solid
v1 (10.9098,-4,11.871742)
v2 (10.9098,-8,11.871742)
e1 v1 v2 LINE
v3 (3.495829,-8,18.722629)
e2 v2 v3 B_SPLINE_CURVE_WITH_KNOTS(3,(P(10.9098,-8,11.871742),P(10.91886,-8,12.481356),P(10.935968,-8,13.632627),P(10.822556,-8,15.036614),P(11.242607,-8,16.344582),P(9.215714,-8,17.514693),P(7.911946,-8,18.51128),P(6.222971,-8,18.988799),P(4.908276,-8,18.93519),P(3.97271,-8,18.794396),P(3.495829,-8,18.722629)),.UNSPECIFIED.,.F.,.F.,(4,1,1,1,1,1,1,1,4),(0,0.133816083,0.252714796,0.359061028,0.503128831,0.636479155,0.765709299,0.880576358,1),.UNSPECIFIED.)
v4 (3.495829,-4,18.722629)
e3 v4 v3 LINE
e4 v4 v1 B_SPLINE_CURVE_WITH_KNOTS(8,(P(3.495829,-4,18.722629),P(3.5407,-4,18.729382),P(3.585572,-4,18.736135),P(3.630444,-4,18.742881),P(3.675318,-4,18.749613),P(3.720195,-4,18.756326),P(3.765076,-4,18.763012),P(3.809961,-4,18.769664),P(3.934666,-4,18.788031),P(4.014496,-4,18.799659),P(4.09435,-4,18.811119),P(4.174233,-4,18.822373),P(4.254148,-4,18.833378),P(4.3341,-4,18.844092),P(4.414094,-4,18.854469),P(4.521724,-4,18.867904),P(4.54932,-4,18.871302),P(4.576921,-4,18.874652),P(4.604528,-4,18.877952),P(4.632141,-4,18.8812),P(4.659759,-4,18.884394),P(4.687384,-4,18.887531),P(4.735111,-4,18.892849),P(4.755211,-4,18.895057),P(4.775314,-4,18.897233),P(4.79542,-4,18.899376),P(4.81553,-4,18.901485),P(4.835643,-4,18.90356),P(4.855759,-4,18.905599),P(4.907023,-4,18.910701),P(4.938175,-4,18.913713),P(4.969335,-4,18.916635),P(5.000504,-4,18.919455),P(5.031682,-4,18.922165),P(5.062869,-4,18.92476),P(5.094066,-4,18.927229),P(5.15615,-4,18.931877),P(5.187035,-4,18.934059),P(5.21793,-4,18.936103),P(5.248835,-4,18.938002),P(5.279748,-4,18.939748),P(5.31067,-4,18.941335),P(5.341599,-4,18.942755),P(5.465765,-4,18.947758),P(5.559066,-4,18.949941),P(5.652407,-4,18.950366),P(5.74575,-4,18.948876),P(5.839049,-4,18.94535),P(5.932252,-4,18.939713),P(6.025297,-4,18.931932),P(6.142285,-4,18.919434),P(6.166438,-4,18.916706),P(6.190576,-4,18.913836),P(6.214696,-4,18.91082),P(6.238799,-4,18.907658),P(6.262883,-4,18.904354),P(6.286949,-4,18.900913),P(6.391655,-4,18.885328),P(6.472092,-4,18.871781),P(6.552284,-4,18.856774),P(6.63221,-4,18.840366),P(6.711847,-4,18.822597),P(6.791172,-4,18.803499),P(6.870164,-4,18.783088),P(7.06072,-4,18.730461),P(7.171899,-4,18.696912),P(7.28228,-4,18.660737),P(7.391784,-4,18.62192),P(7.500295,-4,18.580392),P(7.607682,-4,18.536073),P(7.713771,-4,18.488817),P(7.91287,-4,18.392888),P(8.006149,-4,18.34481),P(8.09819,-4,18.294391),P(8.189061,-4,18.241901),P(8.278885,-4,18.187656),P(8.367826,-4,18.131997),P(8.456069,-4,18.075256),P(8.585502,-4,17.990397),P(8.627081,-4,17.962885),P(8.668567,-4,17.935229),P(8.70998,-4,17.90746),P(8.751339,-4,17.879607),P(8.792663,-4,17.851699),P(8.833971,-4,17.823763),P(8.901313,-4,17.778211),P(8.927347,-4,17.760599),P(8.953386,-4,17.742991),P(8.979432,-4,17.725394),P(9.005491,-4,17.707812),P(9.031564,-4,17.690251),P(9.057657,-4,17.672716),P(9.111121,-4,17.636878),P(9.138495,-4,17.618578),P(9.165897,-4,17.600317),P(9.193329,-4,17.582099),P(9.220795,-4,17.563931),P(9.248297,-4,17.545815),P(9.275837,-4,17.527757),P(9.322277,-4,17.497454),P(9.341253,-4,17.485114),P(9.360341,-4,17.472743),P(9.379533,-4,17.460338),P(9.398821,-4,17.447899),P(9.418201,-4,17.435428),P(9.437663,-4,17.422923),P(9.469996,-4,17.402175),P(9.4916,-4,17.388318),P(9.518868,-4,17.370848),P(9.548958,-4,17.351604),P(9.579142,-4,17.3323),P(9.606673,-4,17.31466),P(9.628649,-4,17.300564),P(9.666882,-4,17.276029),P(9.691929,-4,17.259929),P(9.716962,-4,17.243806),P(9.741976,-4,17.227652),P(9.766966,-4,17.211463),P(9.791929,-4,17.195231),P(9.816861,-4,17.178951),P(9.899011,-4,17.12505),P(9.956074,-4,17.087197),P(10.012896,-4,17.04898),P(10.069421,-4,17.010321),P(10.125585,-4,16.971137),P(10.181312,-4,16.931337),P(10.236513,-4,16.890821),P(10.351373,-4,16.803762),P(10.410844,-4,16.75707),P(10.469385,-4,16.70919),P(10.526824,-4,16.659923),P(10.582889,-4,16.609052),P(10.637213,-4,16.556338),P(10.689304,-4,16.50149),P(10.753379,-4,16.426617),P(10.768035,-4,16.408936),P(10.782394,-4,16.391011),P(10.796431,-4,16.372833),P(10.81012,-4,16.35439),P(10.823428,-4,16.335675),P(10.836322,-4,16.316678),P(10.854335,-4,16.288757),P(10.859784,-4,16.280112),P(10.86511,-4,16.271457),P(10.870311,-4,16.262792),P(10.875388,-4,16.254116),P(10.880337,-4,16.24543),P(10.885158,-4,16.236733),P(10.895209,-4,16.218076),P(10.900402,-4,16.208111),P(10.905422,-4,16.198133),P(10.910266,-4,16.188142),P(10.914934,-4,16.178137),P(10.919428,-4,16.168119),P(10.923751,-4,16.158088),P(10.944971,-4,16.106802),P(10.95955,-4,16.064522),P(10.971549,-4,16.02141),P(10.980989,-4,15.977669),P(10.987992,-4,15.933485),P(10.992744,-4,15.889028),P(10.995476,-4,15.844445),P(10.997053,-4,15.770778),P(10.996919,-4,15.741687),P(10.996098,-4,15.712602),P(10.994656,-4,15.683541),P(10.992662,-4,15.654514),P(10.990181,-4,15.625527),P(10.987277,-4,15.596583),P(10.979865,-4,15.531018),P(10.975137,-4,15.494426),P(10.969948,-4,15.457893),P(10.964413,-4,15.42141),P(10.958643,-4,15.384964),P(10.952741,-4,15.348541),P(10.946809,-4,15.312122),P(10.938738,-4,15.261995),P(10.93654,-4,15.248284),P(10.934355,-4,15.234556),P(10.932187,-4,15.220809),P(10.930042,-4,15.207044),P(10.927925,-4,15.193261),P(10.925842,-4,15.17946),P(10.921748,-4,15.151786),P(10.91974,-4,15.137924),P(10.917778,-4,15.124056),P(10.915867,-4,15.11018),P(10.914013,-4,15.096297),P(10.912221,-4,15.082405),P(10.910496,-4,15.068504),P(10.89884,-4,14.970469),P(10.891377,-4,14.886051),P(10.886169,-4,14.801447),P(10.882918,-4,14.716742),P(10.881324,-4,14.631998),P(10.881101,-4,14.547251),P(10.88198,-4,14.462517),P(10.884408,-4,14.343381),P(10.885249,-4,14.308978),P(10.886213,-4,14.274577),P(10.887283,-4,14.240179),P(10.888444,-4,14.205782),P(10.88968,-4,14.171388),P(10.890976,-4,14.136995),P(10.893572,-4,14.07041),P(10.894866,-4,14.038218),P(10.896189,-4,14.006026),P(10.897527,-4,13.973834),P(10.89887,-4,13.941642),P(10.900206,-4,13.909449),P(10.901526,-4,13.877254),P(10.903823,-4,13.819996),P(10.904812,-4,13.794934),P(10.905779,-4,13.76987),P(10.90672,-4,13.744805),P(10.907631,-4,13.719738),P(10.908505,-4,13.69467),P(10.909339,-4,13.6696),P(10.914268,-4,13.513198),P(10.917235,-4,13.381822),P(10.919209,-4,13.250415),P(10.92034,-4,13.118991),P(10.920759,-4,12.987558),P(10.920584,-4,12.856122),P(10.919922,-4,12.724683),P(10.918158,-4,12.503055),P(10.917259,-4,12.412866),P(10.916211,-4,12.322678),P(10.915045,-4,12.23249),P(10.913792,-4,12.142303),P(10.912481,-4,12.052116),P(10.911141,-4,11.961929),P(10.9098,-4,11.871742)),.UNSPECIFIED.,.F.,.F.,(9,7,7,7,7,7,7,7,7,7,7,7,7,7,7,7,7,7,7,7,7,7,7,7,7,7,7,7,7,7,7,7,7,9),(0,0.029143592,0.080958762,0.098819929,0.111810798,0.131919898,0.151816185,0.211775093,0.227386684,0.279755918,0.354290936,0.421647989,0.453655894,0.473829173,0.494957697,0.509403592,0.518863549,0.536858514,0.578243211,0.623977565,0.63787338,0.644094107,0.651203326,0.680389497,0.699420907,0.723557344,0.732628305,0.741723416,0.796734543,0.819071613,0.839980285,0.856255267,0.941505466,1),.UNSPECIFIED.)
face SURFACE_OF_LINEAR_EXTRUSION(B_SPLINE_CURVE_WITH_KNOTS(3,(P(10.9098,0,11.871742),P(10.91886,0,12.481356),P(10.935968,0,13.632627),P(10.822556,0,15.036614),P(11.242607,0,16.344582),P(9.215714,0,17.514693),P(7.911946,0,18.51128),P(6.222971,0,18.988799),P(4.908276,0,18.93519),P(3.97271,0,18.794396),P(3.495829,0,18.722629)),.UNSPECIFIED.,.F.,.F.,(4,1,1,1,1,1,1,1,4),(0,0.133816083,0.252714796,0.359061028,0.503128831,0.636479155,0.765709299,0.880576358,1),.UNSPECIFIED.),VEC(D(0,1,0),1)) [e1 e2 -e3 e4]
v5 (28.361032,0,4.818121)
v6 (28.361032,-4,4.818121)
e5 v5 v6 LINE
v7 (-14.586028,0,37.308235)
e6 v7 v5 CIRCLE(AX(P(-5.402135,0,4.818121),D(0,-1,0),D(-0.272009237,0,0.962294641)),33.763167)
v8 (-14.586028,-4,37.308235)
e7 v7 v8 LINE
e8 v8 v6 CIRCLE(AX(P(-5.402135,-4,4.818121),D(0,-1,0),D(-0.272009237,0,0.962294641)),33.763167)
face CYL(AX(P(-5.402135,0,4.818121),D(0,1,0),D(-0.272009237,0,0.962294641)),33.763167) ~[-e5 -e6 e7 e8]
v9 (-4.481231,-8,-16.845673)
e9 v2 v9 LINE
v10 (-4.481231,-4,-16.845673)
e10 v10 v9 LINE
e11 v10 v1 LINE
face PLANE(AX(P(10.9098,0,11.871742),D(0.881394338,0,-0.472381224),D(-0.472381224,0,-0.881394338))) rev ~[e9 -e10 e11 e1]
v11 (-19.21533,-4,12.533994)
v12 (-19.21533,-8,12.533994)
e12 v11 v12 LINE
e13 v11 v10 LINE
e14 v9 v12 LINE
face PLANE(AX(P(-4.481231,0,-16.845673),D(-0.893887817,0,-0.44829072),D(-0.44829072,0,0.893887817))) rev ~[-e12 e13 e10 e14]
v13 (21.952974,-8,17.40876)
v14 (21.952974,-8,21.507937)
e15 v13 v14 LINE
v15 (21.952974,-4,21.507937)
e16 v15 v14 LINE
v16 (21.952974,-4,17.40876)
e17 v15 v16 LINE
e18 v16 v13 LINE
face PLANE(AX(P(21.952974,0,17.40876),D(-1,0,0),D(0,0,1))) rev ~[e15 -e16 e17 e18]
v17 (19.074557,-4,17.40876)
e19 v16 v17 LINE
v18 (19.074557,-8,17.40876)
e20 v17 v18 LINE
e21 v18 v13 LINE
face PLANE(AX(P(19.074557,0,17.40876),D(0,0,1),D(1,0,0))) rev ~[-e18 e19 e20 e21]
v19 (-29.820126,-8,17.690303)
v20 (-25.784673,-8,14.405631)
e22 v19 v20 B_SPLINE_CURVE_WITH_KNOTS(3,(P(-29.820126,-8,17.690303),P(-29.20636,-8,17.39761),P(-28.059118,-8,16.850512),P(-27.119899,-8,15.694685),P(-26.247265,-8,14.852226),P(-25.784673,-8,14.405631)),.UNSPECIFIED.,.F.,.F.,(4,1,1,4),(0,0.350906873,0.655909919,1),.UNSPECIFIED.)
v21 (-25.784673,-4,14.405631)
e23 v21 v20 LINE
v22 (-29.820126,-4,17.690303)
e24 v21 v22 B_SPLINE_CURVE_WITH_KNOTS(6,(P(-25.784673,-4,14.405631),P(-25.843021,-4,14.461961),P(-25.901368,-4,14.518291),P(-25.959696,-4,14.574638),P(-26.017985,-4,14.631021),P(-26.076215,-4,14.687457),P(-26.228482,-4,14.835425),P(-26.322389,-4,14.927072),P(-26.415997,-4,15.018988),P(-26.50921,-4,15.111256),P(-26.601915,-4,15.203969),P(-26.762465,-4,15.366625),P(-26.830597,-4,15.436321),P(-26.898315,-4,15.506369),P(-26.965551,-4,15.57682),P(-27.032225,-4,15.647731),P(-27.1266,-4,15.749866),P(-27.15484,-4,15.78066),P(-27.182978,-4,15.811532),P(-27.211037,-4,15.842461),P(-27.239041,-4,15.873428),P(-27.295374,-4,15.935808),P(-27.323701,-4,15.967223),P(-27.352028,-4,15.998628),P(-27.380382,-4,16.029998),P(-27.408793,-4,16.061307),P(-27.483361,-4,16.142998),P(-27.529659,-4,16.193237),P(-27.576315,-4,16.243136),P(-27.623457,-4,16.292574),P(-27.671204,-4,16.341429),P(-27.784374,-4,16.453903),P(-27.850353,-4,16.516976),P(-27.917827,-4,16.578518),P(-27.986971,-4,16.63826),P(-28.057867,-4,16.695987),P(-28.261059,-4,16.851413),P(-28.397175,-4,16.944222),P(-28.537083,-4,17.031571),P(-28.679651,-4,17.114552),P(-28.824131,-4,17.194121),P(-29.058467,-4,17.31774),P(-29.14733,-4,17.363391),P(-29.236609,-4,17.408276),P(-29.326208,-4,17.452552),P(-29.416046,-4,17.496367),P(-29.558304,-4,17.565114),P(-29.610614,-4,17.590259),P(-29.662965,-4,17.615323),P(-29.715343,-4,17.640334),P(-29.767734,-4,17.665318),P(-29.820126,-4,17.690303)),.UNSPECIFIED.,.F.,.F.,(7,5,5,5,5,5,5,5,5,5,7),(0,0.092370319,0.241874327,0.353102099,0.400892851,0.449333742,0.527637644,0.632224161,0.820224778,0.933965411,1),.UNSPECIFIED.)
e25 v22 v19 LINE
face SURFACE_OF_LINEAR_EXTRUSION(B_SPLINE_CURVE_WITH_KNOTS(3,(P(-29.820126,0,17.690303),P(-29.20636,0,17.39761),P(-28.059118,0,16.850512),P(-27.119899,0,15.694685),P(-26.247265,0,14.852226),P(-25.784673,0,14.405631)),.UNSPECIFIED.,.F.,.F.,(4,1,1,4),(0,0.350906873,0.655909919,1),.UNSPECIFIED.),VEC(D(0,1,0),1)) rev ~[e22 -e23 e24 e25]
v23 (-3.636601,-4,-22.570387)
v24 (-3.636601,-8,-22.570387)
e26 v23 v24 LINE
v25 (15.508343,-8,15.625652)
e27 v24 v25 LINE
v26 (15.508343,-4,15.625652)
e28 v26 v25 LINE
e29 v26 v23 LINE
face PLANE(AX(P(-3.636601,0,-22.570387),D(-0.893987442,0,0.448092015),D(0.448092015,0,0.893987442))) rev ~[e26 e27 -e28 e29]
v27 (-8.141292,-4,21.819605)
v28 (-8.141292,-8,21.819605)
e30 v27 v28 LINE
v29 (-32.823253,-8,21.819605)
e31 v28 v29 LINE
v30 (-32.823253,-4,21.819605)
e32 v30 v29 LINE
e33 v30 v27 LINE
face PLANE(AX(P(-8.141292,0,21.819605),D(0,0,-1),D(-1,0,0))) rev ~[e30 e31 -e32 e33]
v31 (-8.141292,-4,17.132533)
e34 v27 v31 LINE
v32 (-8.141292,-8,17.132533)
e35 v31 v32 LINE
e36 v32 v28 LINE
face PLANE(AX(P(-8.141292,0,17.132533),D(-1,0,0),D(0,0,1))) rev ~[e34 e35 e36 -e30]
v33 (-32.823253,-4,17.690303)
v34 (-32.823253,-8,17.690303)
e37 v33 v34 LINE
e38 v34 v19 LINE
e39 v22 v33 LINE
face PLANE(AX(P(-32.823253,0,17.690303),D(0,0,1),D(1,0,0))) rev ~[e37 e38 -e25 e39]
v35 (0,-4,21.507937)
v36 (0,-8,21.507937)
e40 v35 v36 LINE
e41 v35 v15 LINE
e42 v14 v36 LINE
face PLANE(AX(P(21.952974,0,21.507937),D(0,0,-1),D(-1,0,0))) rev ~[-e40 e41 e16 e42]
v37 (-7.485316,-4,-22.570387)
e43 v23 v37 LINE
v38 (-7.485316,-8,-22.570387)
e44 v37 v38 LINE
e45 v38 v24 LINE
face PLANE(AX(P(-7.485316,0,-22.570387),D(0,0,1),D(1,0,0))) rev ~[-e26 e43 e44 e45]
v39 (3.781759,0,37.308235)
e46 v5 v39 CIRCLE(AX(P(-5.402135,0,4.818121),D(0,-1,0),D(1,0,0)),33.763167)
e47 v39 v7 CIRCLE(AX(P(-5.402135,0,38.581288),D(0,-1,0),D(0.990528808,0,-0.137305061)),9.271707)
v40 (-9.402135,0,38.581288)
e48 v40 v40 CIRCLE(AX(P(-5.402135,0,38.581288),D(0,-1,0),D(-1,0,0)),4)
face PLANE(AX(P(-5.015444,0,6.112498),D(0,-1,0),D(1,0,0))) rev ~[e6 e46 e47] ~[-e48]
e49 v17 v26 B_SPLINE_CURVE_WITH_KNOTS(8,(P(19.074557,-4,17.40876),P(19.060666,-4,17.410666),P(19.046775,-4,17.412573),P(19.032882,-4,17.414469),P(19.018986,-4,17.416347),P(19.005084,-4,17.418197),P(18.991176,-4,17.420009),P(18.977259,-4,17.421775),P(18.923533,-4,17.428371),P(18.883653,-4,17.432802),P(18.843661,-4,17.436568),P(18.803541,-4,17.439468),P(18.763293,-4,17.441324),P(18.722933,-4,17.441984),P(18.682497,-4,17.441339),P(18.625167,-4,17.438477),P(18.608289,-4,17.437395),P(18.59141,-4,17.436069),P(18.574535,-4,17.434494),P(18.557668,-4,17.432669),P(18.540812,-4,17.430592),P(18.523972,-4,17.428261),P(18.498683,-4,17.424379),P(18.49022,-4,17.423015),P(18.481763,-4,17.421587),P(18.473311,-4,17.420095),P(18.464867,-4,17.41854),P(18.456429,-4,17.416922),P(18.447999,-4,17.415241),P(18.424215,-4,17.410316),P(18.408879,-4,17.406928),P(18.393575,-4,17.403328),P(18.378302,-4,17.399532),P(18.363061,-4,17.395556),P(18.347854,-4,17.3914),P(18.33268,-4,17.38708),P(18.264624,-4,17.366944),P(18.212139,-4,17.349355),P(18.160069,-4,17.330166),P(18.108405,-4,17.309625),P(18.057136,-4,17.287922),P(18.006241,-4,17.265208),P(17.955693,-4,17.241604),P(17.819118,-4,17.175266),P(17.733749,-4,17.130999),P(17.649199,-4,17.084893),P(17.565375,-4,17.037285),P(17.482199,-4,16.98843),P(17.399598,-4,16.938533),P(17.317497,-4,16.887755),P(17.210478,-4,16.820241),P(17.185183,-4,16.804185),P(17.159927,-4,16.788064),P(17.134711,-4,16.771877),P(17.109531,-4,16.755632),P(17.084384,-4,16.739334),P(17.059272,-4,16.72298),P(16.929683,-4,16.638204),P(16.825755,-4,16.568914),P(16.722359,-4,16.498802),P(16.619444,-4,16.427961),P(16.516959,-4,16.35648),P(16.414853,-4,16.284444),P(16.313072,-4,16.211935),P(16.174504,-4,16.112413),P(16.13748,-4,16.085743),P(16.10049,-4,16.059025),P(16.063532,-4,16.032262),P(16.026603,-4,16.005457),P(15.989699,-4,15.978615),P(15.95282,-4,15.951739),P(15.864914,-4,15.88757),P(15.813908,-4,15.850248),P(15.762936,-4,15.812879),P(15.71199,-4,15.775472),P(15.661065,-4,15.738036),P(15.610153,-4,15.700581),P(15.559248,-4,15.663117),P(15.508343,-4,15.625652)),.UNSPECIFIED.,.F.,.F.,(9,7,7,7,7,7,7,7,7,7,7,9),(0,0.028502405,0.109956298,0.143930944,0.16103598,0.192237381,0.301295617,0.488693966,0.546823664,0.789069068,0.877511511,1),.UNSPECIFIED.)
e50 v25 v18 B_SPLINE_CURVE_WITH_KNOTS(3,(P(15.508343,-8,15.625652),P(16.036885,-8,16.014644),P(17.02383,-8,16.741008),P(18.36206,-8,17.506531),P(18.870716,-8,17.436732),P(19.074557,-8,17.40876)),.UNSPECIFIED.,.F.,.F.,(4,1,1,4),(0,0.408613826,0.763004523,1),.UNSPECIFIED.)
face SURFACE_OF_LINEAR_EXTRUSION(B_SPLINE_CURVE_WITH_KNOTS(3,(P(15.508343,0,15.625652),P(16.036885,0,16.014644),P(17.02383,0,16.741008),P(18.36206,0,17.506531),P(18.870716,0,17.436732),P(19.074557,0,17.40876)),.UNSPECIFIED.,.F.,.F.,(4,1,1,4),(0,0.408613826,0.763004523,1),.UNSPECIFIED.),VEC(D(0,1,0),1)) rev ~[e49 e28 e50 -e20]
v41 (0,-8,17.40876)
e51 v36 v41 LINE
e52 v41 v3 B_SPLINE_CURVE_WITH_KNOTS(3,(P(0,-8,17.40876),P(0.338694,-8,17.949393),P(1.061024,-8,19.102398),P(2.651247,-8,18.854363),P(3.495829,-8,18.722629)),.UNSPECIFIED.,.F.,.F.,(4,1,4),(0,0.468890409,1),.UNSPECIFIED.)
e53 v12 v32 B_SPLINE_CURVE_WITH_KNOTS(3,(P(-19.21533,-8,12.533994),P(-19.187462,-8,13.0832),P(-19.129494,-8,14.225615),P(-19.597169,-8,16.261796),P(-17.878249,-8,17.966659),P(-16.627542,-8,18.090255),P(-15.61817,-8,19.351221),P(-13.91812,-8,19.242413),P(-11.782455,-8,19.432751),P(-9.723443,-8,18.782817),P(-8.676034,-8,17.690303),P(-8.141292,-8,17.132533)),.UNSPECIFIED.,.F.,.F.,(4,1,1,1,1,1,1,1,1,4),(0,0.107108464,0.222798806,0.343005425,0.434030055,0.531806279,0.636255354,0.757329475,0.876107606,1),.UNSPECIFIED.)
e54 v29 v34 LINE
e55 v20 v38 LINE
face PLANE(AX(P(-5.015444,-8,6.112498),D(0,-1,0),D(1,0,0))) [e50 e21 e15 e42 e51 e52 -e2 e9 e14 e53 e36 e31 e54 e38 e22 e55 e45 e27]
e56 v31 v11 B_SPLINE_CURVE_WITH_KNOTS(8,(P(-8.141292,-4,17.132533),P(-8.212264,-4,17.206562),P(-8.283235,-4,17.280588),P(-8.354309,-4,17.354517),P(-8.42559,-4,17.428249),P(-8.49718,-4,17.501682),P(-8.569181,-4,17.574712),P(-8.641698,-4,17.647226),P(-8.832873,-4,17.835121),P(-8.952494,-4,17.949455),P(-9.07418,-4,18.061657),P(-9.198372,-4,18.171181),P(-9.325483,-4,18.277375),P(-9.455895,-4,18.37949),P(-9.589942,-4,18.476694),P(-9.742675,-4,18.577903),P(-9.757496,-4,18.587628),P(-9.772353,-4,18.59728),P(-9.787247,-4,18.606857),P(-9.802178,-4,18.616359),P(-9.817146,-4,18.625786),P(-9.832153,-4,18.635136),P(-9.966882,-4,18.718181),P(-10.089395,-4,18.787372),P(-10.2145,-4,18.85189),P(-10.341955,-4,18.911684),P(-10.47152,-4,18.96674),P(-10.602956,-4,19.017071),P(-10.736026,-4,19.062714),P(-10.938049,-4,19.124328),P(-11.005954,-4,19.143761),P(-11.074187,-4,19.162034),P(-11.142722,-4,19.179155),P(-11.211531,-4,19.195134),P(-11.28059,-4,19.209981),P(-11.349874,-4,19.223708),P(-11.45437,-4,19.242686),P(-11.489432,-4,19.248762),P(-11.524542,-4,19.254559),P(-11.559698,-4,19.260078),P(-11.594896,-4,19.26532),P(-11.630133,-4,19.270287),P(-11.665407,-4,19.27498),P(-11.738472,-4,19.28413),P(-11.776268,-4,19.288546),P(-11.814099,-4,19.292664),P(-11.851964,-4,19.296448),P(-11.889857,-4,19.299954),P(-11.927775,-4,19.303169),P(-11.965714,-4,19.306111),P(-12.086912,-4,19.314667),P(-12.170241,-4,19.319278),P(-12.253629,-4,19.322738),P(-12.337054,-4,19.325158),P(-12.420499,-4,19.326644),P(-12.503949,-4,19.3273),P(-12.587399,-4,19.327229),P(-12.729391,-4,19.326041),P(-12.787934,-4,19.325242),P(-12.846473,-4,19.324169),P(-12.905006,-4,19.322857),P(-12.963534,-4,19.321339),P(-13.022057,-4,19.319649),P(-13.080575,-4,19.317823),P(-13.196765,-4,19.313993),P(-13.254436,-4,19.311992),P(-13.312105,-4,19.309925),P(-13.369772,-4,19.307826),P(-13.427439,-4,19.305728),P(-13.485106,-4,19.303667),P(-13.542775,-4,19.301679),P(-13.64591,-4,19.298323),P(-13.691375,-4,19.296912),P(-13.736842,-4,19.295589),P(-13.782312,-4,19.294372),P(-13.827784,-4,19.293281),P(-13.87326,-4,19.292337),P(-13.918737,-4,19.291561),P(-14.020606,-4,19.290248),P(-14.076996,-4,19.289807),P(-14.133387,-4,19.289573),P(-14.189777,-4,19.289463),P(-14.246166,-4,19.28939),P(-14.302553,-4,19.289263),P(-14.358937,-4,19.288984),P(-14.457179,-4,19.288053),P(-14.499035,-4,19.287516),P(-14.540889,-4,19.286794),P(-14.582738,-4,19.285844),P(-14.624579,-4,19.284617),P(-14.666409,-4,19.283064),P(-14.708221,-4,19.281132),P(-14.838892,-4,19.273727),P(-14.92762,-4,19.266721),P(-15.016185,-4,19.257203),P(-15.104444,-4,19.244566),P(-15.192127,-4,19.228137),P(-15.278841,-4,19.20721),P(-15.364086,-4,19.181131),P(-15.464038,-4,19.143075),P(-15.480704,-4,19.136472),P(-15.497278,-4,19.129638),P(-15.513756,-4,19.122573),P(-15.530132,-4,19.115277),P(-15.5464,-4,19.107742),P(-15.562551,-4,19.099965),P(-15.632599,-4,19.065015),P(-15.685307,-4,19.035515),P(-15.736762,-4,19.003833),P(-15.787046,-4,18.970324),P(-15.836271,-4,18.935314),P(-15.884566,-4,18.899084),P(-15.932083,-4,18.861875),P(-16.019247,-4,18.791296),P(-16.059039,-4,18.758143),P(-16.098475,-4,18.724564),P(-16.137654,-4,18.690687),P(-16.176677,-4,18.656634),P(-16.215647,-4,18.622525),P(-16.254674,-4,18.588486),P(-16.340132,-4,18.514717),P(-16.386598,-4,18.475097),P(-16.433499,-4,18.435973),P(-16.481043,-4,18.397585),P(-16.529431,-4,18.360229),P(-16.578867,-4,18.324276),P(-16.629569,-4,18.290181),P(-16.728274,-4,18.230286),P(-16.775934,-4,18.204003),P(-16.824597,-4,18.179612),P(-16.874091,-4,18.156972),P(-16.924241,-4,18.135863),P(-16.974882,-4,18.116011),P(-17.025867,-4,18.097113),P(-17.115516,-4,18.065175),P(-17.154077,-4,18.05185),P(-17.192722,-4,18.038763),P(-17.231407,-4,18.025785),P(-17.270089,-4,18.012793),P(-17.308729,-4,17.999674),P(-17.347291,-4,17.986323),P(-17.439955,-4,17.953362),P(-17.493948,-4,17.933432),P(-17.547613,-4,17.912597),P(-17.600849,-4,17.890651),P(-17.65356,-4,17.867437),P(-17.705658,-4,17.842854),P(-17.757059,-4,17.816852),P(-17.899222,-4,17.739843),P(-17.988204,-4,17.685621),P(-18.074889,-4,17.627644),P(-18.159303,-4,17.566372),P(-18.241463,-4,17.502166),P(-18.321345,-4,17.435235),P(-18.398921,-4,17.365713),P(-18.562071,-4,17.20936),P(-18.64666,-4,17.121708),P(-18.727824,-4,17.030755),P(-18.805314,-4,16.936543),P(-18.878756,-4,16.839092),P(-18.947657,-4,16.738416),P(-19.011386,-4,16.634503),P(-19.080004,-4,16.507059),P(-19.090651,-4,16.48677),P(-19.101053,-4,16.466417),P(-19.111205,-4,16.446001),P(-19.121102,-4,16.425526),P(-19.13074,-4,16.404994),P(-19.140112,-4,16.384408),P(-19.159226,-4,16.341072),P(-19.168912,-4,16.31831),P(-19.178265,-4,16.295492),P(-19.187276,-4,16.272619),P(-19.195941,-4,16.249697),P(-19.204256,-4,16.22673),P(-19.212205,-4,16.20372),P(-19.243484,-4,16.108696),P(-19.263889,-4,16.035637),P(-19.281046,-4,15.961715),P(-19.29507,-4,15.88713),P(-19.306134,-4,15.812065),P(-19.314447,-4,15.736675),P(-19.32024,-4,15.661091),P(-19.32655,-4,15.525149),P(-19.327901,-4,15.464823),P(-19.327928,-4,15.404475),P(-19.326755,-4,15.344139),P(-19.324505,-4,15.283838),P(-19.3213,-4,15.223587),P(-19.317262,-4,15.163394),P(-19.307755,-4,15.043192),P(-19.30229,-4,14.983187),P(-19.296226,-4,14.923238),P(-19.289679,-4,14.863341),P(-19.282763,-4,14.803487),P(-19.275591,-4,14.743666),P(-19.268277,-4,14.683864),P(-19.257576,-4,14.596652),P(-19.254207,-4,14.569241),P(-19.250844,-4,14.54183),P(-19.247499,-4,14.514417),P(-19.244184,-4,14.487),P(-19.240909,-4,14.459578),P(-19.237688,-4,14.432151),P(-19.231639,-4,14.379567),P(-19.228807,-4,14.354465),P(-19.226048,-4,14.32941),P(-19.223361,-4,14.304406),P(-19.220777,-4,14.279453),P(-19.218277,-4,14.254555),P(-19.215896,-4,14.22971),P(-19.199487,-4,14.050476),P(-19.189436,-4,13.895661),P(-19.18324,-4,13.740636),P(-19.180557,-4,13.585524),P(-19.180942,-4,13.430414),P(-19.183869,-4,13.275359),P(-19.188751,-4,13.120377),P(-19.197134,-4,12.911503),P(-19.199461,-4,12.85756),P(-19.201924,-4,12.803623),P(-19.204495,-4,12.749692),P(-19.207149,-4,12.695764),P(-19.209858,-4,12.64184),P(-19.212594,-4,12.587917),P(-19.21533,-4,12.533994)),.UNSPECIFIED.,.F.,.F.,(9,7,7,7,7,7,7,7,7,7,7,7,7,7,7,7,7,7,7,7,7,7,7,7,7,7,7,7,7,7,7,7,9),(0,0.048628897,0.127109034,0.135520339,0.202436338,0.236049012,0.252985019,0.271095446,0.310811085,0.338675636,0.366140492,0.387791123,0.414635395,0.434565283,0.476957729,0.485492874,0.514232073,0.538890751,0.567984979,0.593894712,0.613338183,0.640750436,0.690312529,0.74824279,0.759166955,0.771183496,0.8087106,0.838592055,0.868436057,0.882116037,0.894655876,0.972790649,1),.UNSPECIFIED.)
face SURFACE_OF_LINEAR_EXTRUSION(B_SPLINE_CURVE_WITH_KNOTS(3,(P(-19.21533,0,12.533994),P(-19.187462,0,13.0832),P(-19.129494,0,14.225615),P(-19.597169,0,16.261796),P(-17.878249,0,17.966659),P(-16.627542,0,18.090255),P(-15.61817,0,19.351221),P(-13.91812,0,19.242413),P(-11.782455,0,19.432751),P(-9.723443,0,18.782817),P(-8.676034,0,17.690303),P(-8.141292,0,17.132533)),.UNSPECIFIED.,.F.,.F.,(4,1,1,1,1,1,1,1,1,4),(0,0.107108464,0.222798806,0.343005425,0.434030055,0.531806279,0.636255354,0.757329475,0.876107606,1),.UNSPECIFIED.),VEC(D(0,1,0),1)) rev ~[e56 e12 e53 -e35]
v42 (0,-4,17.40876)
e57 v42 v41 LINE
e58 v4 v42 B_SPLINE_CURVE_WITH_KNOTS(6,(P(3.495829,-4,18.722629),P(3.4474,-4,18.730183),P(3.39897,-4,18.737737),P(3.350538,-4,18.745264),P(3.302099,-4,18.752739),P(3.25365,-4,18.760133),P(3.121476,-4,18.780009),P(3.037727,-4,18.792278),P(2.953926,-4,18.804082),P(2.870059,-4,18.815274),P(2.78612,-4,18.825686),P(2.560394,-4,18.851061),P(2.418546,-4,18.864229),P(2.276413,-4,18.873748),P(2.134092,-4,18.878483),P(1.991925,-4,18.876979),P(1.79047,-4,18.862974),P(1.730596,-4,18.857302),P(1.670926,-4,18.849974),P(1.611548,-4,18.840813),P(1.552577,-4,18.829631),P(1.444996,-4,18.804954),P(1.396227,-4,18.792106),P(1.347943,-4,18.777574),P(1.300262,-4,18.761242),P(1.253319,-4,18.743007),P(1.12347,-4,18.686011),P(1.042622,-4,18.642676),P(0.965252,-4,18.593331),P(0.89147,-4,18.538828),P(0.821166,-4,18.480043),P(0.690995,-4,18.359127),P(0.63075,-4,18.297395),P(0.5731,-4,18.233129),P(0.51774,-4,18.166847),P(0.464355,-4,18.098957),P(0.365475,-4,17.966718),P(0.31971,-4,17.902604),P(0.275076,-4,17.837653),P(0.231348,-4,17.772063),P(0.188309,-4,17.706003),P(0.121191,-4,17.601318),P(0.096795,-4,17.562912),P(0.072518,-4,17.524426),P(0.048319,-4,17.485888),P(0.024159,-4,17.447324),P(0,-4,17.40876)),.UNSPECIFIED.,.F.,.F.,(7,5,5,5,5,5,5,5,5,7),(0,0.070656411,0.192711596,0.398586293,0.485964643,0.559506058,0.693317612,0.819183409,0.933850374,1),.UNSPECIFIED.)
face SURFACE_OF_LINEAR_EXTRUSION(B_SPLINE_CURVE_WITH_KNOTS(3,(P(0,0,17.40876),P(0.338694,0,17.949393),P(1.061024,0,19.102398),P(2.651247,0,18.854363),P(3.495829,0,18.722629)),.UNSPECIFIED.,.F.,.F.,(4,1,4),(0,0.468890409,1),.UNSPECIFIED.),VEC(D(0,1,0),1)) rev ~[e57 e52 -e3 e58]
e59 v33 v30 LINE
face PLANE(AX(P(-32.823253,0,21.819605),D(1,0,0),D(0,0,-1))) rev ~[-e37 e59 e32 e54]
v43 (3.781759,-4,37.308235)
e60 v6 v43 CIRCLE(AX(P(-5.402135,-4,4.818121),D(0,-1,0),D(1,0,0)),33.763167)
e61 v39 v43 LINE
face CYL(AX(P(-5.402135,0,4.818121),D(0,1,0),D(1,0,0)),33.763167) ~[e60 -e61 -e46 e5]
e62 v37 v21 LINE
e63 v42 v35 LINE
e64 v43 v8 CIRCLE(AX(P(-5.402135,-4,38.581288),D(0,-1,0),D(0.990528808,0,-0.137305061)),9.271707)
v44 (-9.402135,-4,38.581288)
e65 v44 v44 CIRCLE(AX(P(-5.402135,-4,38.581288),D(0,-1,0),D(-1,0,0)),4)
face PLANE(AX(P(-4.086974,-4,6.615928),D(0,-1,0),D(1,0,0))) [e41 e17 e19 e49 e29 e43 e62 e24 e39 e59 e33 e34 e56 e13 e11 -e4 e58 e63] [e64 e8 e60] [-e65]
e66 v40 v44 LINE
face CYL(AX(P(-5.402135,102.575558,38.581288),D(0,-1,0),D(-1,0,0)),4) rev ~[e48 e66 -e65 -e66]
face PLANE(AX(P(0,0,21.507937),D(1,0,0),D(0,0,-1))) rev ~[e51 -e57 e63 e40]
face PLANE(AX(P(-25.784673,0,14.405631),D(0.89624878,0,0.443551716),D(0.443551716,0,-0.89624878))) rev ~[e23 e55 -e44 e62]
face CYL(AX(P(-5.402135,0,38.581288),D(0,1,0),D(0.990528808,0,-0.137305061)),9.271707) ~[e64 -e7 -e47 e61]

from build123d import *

# Parameters (mm, degrees)
F2_DEPTH = 4
F3_DEPTH = 8
F4_D     = 8


with BuildPart() as f2:
    # F0 (on Front) → F2 (new body)
    with BuildSketch(Plane.XZ):
        with BuildLine():
            ThreePointArc((-14.5860280627, 37.3082353296), (-25.7721388072, -22.1079707805), (28.3610324481, 4.8181205057))
            ThreePointArc((28.3610324481, 4.8181205057), (21.5239565547, 25.1881245814), (3.7817585998, 37.3082353296))
            ThreePointArc((3.7817585998, 37.3082353296), (-5.4021347314, 38.5812876852), (-14.5860280627, 37.3082353296))
        make_face()
        with BuildLine():
            ThreePointArc((-14.5860280627, 37.3082353296), (-5.4021347314, 38.5812876852), (3.7817585998, 37.3082353296))
            ThreePointArc((3.7817585998, 37.3082353296), (-5.4021347314, 47.8529951342), (-14.5860280627, 37.3082353296))
        make_face()
    extrude(amount=F2_DEPTH)

    # F1 (on Front) → F3 (join)
    with BuildSketch(Plane.XZ):
        with BuildLine():
            Line((-4.4812308624, -16.8456733227), (-19.2153304815, 12.5339938145))
            add(Edge.make_bspline(
                [(-19.2153304815, 12.5339938145), (-19.187462489, 13.0831996069), (-19.1294936303, 14.2256153377), (-19.5971693345, 16.2617964648), (-17.8782485083, 17.9666592712), (-16.6275418026, 18.0902554056), (-15.6181704414, 19.3512209953), (-13.9181197744, 19.2424127885), (-11.7824548248, 19.4327511912), (-9.7234432074, 18.78281747), (-8.6760339336, 17.6903028041), (-8.1412922591, 17.1325331371)],
                knots=[0, 0, 0, 0, 0.1071084643, 0.2227988055, 0.3430054249, 0.4340300552, 0.531806279, 0.6362553536, 0.7573294755, 0.8761076058, 1, 1, 1, 1], degree=3))
            Line((-8.1412922591, 17.1325331371), (-8.1412922591, 21.8196045607))
            Line((-8.1412922591, 21.8196045607), (-32.823253423, 21.8196045607))
            Line((-32.823253423, 21.8196045607), (-32.823253423, 17.6903028041))
            Line((-32.823253423, 17.6903028041), (-29.82012555, 17.6903028041))
            add(Edge.make_bspline(
                [(-29.82012555, 17.6903028041), (-29.2063598721, 17.3976096984), (-28.0591181767, 16.8505120895), (-27.1198992634, 15.6946853483), (-26.2472646135, 14.852226462), (-25.7846731693, 14.4056314602)],
                knots=[0, 0, 0, 0, 0.3509068735, 0.6559099195, 1, 1, 1, 1], degree=3))
            Line((-25.7846731693, 14.4056314602), (-7.4853163581, -22.570386529))
            Line((-7.4853163581, -22.570386529), (-3.6366009153, -22.570386529))
            Line((-3.6366009153, -22.570386529), (15.5083434656, 15.6256519258))
            add(Edge.make_bspline(
                [(15.5083434656, 15.6256519258), (16.0368847546, 16.0146436885), (17.0238298067, 16.7410079357), (18.3620600475, 17.5065309977), (18.870715753, 17.4367319386), (19.0745573491, 17.4087602645)],
                knots=[0, 0, 0, 0, 0.4086138264, 0.763004523, 1, 1, 1, 1], degree=3))
            Line((19.0745573491, 17.4087602645), (21.9529736787, 17.4087602645))
            Line((21.9529736787, 17.4087602645), (21.9529736787, 21.5079374611))
            Line((21.9529736787, 21.5079374611), (0, 21.5079374611))
            Line((0, 21.5079374611), (0, 17.4087602645))
            add(Edge.make_bspline(
                [(0, 17.4087602645), (0.3386937554, 17.949393323), (1.0610240671, 19.1023984773), (2.6512466921, 18.8543631276), (3.4958291799, 18.7226291746)],
                knots=[0, 0, 0, 0, 0.4688904091, 1, 1, 1, 1], degree=3))
            add(Edge.make_bspline(
                [(10.9098004177, 11.8717420846), (10.9188597305, 12.4813561639), (10.935968454, 13.6326265761), (10.8225562165, 15.0366139564), (11.2426073131, 16.3445815867), (9.2157140004, 17.5146925888), (7.9119458784, 18.5112803322), (6.2229710967, 18.9887989549), (4.9082762613, 18.9351899547), (3.9727099672, 18.7943955108), (3.4958291799, 18.7226291746)],
                knots=[0, 0, 0, 0, 0.1338160834, 0.2527147957, 0.3590610282, 0.503128831, 0.6364791552, 0.7657092985, 0.880576358, 1, 1, 1, 1], degree=3))
            Line((10.9098004177, 11.8717420846), (-4.4812308624, -16.8456733227))
        make_face()
    extrude(amount=F3_DEPTH)

    # F4 (through all)
    with Locations(Plane(origin=(0, 0, 0), x_dir=(1, 0, 0), z_dir=(0, 1, 0))):
        with Locations((-5.4021347314, -38.5812876852)):
            Hole(F4_D / 2)


solid = f2.part
